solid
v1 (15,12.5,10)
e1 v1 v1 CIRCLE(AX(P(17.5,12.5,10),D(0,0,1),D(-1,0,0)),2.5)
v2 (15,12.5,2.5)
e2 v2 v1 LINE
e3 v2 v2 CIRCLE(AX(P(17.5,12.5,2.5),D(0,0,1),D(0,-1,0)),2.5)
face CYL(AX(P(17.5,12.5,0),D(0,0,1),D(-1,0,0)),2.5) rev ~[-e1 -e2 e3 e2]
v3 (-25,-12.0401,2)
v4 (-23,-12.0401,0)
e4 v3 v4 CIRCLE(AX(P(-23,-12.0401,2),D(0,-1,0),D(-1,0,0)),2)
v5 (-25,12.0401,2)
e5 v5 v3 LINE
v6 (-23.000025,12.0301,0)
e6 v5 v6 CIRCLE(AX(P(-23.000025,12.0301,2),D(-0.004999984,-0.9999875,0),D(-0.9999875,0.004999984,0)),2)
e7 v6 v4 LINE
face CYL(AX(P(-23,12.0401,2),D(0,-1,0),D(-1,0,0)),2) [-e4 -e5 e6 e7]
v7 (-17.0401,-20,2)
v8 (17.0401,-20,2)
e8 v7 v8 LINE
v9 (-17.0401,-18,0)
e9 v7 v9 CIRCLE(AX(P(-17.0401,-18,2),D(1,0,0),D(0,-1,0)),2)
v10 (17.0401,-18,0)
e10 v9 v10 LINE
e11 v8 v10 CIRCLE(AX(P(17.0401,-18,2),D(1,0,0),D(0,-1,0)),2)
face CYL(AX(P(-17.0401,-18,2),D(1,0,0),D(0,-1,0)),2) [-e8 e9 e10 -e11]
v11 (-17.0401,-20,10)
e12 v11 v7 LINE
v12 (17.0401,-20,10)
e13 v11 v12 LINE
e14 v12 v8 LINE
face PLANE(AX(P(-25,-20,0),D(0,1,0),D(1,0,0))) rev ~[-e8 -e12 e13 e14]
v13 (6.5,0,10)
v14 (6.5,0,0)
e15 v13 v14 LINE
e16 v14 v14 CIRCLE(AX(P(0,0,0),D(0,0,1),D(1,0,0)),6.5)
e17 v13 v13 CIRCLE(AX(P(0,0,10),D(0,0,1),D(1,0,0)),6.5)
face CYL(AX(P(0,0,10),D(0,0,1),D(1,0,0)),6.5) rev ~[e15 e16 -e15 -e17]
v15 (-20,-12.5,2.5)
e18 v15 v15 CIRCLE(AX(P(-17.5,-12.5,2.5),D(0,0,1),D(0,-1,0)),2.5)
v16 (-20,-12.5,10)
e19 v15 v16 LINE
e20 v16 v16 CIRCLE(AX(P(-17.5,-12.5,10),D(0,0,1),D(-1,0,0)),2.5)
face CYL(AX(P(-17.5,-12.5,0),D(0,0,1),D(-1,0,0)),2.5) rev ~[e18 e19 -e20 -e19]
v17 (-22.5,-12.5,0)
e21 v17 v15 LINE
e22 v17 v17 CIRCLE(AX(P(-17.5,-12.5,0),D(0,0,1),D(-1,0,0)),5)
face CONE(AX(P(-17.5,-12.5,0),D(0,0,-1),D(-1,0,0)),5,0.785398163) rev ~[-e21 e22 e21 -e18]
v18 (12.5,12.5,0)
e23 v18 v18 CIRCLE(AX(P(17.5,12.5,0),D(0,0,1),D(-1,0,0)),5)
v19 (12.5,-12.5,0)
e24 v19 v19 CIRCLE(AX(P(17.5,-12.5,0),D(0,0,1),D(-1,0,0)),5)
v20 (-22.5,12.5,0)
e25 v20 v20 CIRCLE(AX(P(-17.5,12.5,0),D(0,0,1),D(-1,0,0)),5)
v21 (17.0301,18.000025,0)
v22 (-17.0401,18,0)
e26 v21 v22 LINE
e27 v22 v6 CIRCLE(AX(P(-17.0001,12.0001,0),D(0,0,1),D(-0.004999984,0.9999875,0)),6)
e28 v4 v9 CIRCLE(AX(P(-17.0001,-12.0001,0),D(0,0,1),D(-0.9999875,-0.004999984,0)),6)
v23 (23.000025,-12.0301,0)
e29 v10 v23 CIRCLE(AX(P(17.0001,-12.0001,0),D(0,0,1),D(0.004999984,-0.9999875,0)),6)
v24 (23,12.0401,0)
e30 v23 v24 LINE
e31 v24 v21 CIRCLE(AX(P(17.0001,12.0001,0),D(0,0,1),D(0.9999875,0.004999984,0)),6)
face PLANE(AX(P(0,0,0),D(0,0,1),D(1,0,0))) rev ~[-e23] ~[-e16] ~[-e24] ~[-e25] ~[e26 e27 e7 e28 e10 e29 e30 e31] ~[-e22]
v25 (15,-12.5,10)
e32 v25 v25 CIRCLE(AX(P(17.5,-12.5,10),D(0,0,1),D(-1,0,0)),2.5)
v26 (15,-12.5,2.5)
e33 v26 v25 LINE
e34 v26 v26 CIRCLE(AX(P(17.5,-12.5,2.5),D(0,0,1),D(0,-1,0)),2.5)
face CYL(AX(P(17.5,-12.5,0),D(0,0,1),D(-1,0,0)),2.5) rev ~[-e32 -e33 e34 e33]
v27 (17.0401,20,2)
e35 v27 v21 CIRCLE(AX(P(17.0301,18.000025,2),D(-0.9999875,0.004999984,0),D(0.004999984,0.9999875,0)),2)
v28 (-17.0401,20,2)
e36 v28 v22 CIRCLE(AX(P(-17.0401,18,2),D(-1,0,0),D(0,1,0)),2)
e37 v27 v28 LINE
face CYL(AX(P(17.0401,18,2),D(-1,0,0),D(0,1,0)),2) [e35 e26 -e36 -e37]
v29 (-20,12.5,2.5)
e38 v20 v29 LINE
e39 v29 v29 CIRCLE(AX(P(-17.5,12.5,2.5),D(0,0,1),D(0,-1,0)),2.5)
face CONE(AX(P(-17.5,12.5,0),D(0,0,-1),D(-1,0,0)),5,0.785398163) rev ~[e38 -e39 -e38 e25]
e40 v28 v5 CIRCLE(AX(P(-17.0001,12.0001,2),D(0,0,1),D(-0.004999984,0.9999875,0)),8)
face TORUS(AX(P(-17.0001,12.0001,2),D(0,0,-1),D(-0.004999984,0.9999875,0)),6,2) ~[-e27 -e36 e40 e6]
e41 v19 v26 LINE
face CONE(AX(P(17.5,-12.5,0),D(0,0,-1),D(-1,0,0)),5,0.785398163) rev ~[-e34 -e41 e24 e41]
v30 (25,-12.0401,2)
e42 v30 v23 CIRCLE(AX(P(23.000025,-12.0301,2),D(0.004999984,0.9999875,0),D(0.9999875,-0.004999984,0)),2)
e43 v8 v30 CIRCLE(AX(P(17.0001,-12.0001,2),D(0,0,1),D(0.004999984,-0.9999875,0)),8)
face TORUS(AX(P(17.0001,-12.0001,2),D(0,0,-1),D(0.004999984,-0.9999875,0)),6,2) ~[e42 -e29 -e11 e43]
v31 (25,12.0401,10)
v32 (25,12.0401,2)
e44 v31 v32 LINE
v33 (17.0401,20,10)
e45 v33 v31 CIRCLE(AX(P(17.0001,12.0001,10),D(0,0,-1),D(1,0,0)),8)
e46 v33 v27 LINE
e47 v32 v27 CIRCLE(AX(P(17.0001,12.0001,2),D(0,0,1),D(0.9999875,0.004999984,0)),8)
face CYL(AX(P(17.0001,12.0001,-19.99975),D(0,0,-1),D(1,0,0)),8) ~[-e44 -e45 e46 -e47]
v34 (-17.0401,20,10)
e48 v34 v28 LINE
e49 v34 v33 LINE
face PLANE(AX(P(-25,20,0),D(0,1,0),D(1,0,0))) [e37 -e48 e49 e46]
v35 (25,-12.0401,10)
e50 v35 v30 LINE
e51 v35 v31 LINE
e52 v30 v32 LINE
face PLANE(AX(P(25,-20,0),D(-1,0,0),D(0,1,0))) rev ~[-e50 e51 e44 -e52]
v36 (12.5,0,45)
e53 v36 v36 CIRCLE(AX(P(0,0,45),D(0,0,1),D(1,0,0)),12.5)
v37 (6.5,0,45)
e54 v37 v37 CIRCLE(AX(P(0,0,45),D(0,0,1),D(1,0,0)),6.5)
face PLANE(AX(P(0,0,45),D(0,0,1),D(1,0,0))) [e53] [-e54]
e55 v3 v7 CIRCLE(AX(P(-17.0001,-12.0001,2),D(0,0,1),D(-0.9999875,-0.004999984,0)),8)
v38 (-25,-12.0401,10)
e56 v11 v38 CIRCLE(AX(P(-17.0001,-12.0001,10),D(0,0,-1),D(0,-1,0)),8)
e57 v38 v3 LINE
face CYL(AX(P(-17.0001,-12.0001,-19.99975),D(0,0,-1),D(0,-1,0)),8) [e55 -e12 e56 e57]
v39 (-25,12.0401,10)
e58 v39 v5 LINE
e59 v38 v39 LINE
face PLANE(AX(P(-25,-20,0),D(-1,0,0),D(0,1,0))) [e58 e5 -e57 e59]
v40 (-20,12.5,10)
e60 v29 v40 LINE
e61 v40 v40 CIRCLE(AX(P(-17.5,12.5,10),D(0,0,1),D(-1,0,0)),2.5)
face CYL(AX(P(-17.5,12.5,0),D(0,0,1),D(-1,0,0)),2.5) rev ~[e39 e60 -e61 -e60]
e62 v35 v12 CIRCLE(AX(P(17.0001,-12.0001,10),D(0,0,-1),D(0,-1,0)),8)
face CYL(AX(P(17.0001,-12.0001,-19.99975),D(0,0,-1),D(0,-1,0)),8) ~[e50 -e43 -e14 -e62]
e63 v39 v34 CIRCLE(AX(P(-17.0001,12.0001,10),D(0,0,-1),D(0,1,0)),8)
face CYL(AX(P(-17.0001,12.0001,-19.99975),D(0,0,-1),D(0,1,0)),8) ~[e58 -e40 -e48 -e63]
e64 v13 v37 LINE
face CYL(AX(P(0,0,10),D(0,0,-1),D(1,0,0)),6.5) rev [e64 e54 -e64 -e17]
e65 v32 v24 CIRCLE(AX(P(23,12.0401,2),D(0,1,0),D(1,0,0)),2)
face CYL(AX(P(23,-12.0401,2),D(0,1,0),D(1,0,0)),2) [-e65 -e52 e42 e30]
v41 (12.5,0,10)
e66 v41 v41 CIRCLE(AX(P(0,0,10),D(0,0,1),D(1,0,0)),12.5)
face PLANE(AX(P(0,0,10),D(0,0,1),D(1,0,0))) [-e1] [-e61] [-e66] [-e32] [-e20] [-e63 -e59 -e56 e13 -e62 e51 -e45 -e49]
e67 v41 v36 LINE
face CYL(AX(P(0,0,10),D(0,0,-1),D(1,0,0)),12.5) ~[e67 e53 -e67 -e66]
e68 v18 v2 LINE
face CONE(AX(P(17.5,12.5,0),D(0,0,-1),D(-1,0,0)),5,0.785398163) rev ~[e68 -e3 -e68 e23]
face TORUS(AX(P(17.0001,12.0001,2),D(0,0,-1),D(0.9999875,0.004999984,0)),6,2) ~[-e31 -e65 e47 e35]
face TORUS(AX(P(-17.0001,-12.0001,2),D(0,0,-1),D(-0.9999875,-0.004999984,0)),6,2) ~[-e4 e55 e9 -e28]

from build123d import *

# Parameters (mm, degrees)
F1_W           = 50
F1_H           = 40
F2_DEPTH       = 10
F3_T1_DEPTH    = 49.9995000031
F6_D           = 5
F6_DEPTH       = 20
F6_CSINK_D     = 10
F6_CSINK_ANGLE = 90
F6_TIP         = 1.5021515476
F7_R           = 2
F8_R           = 12.5
F8_R_2         = 6.5
F9_DEPTH       = 35
F10_DEPTH      = 25


# Not quite as in the source:
# - a fillet or chamfer that OpenCascade refuses, or shapes differently, is made with other operations: its cross-section is extruded or revolved along the edge and cut away or added


with BuildPart() as f2:
    # F1 (on Top) → F2 (new body)
    with BuildSketch(Plane.XY):
        Rectangle(F1_W, F1_H)
    extrude(amount=F2_DEPTH)

    # F3: fillet of radius 8 on 4 edges, made by hand

    # F3_s2 → F3_t1 (cut)
    with BuildSketch(Plane.XY.offset(-19.9997500016)):
        with BuildLine():
            ThreePointArc((-17.0001, 20.0001), (-22.6569542495, 17.6569542495), (-25.0001, 12.0001))
            Line((-25.0001, 12.0001), (-25.1601, 12.0001))
            ThreePointArc((-25.1601, 12.0001), (-25.16, 16.00005), (-25.16, 20))
            Line((-25.16, 20), (-25, 20.16))
            ThreePointArc((-25, 20.16), (-21.00005, 20.16), (-17.0001, 20.1601))
            Line((-17.0001, 20.1601), (-17.0001, 20.0001))
        make_face()
        with BuildLine():
            ThreePointArc((25.0001, 12.0001), (22.6569542495, 17.6569542495), (17.0001, 20.0001))
            Line((17.0001, 20.0001), (17.0001, 20.1601))
            ThreePointArc((17.0001, 20.1601), (21.00005, 20.16), (25, 20.16))
            Line((25, 20.16), (25.16, 20))
            ThreePointArc((25.16, 20), (25.16, 16.00005), (25.1601, 12.0001))
            Line((25.1601, 12.0001), (25.0001, 12.0001))
        make_face()
        with BuildLine():
            ThreePointArc((17.0001, -20.0001), (22.6569542495, -17.6569542495), (25.0001, -12.0001))
            Line((25.0001, -12.0001), (25.1601, -12.0001))
            ThreePointArc((25.1601, -12.0001), (25.16, -16.00005), (25.16, -20))
            Line((25.16, -20), (25, -20.16))
            ThreePointArc((25, -20.16), (21.00005, -20.16), (17.0001, -20.1601))
            Line((17.0001, -20.1601), (17.0001, -20.0001))
        make_face()
        with BuildLine():
            ThreePointArc((-17.0001, -20.0001), (-22.6569542495, -17.6569542495), (-25.0001, -12.0001))
            Line((-25.0001, -12.0001), (-25.1601, -12.0001))
            ThreePointArc((-25.1601, -12.0001), (-25.16, -16.00005), (-25.16, -20))
            Line((-25.16, -20), (-25, -20.16))
            ThreePointArc((-25, -20.16), (-21.00005, -20.16), (-17.0001, -20.1601))
            Line((-17.0001, -20.1601), (-17.0001, -20.0001))
        make_face()
    extrude(amount=F3_T1_DEPTH, mode=Mode.SUBTRACT)

    # F6
    with Locations(Plane(origin=(0, 0, 0), x_dir=(1, 0, 0), z_dir=(0, 0, -1))):
        with Locations((17.5, 12.5), (-17.5, 12.5), (-17.5, -12.5), (17.5, -12.5)):
            CounterSinkHole(F6_D / 2, F6_CSINK_D / 2, depth=F6_DEPTH, counter_sink_angle=F6_CSINK_ANGLE)
            with Locations((0, 0, -(F6_DEPTH + F6_TIP / 2))):  # 118° drill point
                Cone(0, F6_D / 2, F6_TIP, mode=Mode.SUBTRACT)

    # F7
    f7_edges = [f2.edges().sort_by_distance(p)[0] for p in [
        (0, -20, 0),
        (-22.656954, -17.656954, 0),
        (-25, 0, 0),
        (22.656954, -17.656954, 0),
        (-22.656954, 17.656954, 0),
        (25, 0, 0),
        (0, 20, 0),
        (22.656954, 17.656954, 0),
    ]]
    fillet(f7_edges, radius=F7_R)

    # F8 (on face) → F9 (join)
    with BuildSketch(Plane.XY.offset(10)):
        Circle(F8_R)
        Circle(F8_R_2, mode=Mode.SUBTRACT)
    extrude(amount=F9_DEPTH)

    # F10 (cut): a face of the model
    f10_faces = [f2.faces().sort_by_distance(p)[0] for p in [
        (0, 0, 10),
    ]]
    extrude(f10_faces, amount=-F10_DEPTH, mode=Mode.SUBTRACT)


solid = f2.part
